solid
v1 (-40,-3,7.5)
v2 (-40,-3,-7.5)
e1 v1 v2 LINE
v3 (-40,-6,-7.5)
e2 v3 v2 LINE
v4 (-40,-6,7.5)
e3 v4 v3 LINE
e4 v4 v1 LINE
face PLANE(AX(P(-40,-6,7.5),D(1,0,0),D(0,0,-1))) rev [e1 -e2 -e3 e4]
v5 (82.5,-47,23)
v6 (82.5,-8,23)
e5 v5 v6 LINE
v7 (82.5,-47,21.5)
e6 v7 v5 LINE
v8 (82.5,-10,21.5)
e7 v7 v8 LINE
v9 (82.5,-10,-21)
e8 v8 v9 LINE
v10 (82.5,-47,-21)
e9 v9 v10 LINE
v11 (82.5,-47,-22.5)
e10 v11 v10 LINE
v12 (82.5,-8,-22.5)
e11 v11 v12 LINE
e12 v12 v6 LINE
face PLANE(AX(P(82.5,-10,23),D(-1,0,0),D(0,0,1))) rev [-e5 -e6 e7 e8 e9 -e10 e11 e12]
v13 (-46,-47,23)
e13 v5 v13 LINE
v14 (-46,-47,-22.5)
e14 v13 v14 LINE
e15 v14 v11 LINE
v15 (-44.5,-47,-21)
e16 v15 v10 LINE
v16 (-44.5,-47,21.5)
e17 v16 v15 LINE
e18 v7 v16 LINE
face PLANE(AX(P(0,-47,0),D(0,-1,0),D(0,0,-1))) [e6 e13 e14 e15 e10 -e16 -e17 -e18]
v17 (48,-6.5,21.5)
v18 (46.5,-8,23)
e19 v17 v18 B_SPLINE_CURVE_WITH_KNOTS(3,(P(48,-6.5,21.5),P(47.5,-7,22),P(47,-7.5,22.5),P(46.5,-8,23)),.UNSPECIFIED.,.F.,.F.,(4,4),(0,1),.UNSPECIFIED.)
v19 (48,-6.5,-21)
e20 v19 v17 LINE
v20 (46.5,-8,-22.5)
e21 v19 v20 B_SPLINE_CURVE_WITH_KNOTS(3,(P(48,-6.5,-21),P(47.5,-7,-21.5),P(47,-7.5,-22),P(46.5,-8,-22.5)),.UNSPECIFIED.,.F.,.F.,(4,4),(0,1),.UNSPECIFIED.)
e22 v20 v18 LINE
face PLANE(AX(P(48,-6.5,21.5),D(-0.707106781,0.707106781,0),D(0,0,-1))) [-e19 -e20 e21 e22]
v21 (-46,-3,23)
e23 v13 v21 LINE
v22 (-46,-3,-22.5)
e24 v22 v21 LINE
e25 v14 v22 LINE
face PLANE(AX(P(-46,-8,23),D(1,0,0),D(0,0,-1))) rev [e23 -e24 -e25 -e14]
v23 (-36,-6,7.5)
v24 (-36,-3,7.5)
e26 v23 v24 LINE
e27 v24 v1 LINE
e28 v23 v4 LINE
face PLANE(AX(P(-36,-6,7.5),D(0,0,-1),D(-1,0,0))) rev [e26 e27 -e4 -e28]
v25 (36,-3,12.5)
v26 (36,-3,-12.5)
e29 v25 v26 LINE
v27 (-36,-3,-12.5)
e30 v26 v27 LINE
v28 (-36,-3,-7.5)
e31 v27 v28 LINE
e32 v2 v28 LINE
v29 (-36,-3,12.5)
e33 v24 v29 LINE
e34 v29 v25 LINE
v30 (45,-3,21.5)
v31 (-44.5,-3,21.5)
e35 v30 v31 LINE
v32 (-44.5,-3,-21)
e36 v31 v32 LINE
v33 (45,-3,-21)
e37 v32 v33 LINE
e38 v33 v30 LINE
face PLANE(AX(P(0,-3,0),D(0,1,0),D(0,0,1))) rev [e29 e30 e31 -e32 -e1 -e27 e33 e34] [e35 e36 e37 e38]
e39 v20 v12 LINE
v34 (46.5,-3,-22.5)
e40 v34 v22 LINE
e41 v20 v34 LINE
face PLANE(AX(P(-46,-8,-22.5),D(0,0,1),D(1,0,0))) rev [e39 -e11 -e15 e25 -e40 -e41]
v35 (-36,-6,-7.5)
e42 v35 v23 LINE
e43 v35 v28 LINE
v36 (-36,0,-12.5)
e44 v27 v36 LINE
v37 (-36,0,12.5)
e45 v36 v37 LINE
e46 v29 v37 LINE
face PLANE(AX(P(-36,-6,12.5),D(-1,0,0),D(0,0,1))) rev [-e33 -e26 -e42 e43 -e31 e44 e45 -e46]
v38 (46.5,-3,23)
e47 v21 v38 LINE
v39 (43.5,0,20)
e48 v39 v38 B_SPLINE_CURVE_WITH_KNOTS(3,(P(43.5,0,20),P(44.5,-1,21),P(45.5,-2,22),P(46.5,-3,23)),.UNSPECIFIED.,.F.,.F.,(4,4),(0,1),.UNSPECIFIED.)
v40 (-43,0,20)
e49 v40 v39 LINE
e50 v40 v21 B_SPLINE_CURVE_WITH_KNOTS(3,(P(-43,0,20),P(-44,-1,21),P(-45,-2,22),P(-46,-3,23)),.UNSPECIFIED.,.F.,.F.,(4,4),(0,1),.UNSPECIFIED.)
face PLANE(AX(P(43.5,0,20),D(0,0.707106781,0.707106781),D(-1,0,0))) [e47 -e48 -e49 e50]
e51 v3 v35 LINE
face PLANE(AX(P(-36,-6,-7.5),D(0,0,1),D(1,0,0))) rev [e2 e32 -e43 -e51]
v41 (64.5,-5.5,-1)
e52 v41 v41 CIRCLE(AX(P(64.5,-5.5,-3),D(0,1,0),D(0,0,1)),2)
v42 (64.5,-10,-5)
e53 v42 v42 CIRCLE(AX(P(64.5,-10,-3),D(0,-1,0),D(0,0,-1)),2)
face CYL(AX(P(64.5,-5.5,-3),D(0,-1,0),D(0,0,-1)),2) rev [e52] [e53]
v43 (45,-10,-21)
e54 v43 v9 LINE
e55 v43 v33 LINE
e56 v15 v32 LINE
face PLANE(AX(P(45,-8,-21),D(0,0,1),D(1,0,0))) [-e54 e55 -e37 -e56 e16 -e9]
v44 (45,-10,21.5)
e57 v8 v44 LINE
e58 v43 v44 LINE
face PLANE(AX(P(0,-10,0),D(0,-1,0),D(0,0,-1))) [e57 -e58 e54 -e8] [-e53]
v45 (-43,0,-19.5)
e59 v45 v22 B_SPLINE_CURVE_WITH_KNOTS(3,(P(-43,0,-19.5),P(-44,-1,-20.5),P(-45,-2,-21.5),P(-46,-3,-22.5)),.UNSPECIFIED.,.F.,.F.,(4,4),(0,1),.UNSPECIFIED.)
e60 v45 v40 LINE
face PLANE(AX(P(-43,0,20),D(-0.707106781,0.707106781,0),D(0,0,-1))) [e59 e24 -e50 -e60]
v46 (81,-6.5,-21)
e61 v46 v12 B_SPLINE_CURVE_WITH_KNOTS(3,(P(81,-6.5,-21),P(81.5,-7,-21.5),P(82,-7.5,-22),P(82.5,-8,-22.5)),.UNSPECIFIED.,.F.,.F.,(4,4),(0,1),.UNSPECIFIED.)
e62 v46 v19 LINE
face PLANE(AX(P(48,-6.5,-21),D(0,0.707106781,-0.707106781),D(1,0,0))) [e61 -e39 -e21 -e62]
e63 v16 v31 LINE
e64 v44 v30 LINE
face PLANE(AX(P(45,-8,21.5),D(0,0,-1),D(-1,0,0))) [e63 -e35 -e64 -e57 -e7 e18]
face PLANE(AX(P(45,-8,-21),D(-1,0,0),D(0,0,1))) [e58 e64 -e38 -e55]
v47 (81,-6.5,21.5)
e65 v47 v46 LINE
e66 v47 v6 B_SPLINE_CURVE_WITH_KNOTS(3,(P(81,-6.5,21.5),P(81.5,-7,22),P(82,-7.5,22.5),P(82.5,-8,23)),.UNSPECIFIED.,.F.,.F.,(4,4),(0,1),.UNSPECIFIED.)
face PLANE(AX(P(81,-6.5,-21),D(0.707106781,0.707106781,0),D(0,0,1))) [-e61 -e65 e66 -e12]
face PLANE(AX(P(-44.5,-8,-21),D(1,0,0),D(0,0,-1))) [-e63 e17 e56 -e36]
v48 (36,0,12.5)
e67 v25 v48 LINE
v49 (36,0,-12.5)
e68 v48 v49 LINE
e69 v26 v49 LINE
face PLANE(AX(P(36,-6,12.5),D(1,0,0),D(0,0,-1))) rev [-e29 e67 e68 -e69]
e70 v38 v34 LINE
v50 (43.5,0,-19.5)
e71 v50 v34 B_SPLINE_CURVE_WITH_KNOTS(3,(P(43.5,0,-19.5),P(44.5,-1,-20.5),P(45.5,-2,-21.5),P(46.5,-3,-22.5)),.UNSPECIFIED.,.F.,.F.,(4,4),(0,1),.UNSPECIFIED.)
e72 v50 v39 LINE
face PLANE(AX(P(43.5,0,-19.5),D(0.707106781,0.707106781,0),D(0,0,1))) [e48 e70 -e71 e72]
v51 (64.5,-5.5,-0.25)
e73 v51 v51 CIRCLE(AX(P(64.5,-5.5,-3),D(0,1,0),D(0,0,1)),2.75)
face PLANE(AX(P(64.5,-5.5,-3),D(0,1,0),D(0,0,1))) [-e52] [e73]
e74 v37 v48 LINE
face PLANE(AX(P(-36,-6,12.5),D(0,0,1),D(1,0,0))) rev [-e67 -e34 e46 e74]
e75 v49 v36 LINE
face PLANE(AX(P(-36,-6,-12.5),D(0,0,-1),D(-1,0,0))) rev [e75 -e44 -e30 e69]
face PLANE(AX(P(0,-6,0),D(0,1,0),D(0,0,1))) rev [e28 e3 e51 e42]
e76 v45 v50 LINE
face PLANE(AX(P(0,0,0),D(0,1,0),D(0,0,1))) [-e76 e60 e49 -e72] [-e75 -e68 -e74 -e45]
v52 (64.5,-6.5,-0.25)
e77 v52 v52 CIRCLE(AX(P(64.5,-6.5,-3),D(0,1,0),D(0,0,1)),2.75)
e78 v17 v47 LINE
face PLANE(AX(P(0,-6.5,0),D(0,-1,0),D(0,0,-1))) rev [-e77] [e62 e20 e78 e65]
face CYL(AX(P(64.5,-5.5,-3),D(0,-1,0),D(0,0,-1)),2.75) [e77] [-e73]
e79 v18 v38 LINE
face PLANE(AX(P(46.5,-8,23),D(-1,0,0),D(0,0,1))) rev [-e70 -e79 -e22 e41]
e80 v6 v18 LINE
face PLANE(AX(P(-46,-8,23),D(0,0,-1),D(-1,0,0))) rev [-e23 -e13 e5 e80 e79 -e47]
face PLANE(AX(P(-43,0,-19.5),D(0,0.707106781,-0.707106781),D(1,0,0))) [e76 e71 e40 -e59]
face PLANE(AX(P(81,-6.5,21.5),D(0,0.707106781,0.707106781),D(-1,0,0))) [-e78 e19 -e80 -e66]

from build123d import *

# Parameters (mm, degrees)
TOP_EDGE_OUTLINE_W  = 86.5
TOP_EDGE_OUTLINE_H  = 39.5
TOP_EDGE_DEPTH      = 3
TOP_EDGE_DRAFT      = 45
SKETCH13_W          = 72
SKETCH13_H          = 25
DISPLAY_HOLE_DEPTH  = 6
SKETCH14_W          = 92.5
SKETCH14_H          = 45.5
SKETCH14_W_2        = 89.5
SKETCH14_H_2        = 42.5
BOSS_EXTRUDE5_DEPTH = 5
SKETCH15_W          = 128.5
SKETCH15_H          = 45.5
SKETCH15_W_2        = 89.5
SKETCH15_H_2        = 42.5
BOSS_EXTRUDE6_DEPTH = 2
SKETCH16_W          = 128.5
SKETCH16_H          = 45.5
SKETCH16_W_2        = 125.5
SKETCH16_H_2        = 42.5
BOSS_EXTRUDE7_DEPTH = 37
LOFT2_OUTLINE_W     = 33
LOFT2_OUTLINE_H     = 42.5
LOFT2_DEPTH         = 1.5
LOFT2_DRAFT         = 45
SKETCH19_R          = 2.75
SKETCH19_R_2        = 2
BOSS_EXTRUDE8_DEPTH = 1
CUT_EXTRUDE3_START  = -11
SKETCH20_R          = 2
CUT_EXTRUDE3_DEPTH  = 11
SKETCH21_W          = 12
SKETCH21_H          = 8
CUT_EXTRUDE4_DEPTH  = 11
SKETCH22_W          = 4
SKETCH22_H          = 15
BOSS_EXTRUDE9_DEPTH = 3
SKETCH24_W          = 42.5
SKETCH24_H          = 37
CUT_EXTRUDE5_DEPTH  = 17


# Read off the part's stored shape, not the designer's step: Top Edge, Loft2
with BuildPart() as part:
    # Top Edge outline → Top Edge (with draft: the straight prism first)
    with BuildSketch(Plane(origin=(0, 0, 0), x_dir=(1, 0, 0), z_dir=(0, 1, 0))):
        with Locations((0.25, -0.25)):
            Rectangle(TOP_EDGE_OUTLINE_W, TOP_EDGE_OUTLINE_H)
    extrude(amount=-TOP_EDGE_DEPTH)
    # Top Edge: the draft: its side faces are tilted about the plane it starts from
    top_edge_sides = [part.faces().sort_by_distance(p)[0] for p in [
        (-43, -1.5, 0.25),
        (0.25, -1.5, 20),
        (43.5, -1.5, 0.25),
        (0.25, -1.5, -19.5),
    ]]
    draft(top_edge_sides, Plane(origin=(0, 0, 0), x_dir=(1, 0, 0), z_dir=(0, 1, 0)), TOP_EDGE_DRAFT)

    # Sketch13 → Display Hole (cut)
    with BuildSketch(Plane(origin=(0, 0, 0), x_dir=(1, 0, 0), z_dir=(0, 1, 0))):
        Rectangle(SKETCH13_W, SKETCH13_H)
    extrude(amount=-DISPLAY_HOLE_DEPTH, mode=Mode.SUBTRACT)

    # Sketch14 → Boss-Extrude5 (add)
    with BuildSketch(Plane.XZ.offset(3)):
        with Locations((0.25, 0.25)):
            Rectangle(SKETCH14_W, SKETCH14_H)
        with Locations((0.25, 0.25)):
            Rectangle(SKETCH14_W_2, SKETCH14_H_2, mode=Mode.SUBTRACT)
    extrude(amount=BOSS_EXTRUDE5_DEPTH)

    # Sketch15 → Boss-Extrude6 (add)
    with BuildSketch(Plane.XZ.offset(8)):
        with Locations((18.25, 0.25)):
            Rectangle(SKETCH15_W, SKETCH15_H)
        with Locations((0.25, 0.25)):
            Rectangle(SKETCH15_W_2, SKETCH15_H_2, mode=Mode.SUBTRACT)
    extrude(amount=BOSS_EXTRUDE6_DEPTH)

    # Sketch16 → Boss-Extrude7 (add)
    with BuildSketch(Plane.XZ.offset(10)):
        with Locations((18.25, 0.25)):
            Rectangle(SKETCH16_W, SKETCH16_H)
        with Locations((18.25, 0.25)):
            Rectangle(SKETCH16_W_2, SKETCH16_H_2, mode=Mode.SUBTRACT)
    extrude(amount=BOSS_EXTRUDE7_DEPTH)


with BuildPart() as loft2_tool:
    # Loft2 outline → Loft2 (with draft: the straight prism first)
    with BuildSketch(Plane(origin=(0, -6.5, 0), x_dir=(1, 0, 0), z_dir=(0, 1, 0))):
        with Locations((64.5, -0.25)):
            Rectangle(LOFT2_OUTLINE_W, LOFT2_OUTLINE_H)
    extrude(amount=-LOFT2_DEPTH)
    # Loft2: the draft: its side faces are tilted about the plane it starts from
    loft2_sides = [loft2_tool.faces().sort_by_distance(p)[0] for p in [
        (81, -7.25, 0.25),
        (64.5, -7.25, -21),
        (48, -7.25, 0.25),
        (64.5, -7.25, 21.5),
    ]]
    draft(loft2_sides, Plane(origin=(0, -6.5, 0), x_dir=(1, 0, 0), z_dir=(0, 1, 0)), LOFT2_DRAFT)


with BuildPart() as part_1:
    add(part.part)

    # Loft2: add loft2_tool
    add(loft2_tool.part)

    # Sketch19 → Boss-Extrude8 (add)
    with BuildSketch(Plane(origin=(0, -6.5, 0), x_dir=(1, 0, 0), z_dir=(0, 1, 0))):
        with Locations(Location((64.5, 3, 0), (0, 0, 270))):
            Circle(SKETCH19_R)
        with Locations(Location((64.5, 3, 0), (0, 0, 270))):
            Circle(SKETCH19_R_2, mode=Mode.SUBTRACT)
    extrude(amount=BOSS_EXTRUDE8_DEPTH)

    # Sketch20 → Cut-Extrude3 (cut)
    with BuildSketch(Plane(origin=(0, -6.5, 0), x_dir=(1, 0, 0), z_dir=(0, 1, 0)).offset(CUT_EXTRUDE3_START)):
        with Locations(Location((64.5, 3, 0), (0, 0, 90))):
            Circle(SKETCH20_R)
    extrude(amount=CUT_EXTRUDE3_DEPTH, mode=Mode.SUBTRACT)

    # Sketch21 → Cut-Extrude4 (cut)
    with BuildSketch(Plane(origin=(82.5, 0, 0), x_dir=(0, 0, -1), z_dir=(1, 0, 0))):
        with Locations((0, -43)):
            Rectangle(SKETCH21_W, SKETCH21_H)
    extrude(amount=-CUT_EXTRUDE4_DEPTH, mode=Mode.SUBTRACT)

    # Sketch22 → Boss-Extrude9 (add)
    with BuildSketch(Plane.XZ.offset(3)):
        with Locations((-38, 0)):
            Rectangle(SKETCH22_W, SKETCH22_H)
    extrude(amount=BOSS_EXTRUDE9_DEPTH)

    # Sketch24 → Cut-Extrude5 (cut)
    with BuildSketch(Plane.ZY.offset(-81)):
        with Locations((0.25, -28.5)):
            Rectangle(SKETCH24_W, SKETCH24_H)
    extrude(amount=-CUT_EXTRUDE5_DEPTH, mode=Mode.SUBTRACT)


solid = part_1.part
